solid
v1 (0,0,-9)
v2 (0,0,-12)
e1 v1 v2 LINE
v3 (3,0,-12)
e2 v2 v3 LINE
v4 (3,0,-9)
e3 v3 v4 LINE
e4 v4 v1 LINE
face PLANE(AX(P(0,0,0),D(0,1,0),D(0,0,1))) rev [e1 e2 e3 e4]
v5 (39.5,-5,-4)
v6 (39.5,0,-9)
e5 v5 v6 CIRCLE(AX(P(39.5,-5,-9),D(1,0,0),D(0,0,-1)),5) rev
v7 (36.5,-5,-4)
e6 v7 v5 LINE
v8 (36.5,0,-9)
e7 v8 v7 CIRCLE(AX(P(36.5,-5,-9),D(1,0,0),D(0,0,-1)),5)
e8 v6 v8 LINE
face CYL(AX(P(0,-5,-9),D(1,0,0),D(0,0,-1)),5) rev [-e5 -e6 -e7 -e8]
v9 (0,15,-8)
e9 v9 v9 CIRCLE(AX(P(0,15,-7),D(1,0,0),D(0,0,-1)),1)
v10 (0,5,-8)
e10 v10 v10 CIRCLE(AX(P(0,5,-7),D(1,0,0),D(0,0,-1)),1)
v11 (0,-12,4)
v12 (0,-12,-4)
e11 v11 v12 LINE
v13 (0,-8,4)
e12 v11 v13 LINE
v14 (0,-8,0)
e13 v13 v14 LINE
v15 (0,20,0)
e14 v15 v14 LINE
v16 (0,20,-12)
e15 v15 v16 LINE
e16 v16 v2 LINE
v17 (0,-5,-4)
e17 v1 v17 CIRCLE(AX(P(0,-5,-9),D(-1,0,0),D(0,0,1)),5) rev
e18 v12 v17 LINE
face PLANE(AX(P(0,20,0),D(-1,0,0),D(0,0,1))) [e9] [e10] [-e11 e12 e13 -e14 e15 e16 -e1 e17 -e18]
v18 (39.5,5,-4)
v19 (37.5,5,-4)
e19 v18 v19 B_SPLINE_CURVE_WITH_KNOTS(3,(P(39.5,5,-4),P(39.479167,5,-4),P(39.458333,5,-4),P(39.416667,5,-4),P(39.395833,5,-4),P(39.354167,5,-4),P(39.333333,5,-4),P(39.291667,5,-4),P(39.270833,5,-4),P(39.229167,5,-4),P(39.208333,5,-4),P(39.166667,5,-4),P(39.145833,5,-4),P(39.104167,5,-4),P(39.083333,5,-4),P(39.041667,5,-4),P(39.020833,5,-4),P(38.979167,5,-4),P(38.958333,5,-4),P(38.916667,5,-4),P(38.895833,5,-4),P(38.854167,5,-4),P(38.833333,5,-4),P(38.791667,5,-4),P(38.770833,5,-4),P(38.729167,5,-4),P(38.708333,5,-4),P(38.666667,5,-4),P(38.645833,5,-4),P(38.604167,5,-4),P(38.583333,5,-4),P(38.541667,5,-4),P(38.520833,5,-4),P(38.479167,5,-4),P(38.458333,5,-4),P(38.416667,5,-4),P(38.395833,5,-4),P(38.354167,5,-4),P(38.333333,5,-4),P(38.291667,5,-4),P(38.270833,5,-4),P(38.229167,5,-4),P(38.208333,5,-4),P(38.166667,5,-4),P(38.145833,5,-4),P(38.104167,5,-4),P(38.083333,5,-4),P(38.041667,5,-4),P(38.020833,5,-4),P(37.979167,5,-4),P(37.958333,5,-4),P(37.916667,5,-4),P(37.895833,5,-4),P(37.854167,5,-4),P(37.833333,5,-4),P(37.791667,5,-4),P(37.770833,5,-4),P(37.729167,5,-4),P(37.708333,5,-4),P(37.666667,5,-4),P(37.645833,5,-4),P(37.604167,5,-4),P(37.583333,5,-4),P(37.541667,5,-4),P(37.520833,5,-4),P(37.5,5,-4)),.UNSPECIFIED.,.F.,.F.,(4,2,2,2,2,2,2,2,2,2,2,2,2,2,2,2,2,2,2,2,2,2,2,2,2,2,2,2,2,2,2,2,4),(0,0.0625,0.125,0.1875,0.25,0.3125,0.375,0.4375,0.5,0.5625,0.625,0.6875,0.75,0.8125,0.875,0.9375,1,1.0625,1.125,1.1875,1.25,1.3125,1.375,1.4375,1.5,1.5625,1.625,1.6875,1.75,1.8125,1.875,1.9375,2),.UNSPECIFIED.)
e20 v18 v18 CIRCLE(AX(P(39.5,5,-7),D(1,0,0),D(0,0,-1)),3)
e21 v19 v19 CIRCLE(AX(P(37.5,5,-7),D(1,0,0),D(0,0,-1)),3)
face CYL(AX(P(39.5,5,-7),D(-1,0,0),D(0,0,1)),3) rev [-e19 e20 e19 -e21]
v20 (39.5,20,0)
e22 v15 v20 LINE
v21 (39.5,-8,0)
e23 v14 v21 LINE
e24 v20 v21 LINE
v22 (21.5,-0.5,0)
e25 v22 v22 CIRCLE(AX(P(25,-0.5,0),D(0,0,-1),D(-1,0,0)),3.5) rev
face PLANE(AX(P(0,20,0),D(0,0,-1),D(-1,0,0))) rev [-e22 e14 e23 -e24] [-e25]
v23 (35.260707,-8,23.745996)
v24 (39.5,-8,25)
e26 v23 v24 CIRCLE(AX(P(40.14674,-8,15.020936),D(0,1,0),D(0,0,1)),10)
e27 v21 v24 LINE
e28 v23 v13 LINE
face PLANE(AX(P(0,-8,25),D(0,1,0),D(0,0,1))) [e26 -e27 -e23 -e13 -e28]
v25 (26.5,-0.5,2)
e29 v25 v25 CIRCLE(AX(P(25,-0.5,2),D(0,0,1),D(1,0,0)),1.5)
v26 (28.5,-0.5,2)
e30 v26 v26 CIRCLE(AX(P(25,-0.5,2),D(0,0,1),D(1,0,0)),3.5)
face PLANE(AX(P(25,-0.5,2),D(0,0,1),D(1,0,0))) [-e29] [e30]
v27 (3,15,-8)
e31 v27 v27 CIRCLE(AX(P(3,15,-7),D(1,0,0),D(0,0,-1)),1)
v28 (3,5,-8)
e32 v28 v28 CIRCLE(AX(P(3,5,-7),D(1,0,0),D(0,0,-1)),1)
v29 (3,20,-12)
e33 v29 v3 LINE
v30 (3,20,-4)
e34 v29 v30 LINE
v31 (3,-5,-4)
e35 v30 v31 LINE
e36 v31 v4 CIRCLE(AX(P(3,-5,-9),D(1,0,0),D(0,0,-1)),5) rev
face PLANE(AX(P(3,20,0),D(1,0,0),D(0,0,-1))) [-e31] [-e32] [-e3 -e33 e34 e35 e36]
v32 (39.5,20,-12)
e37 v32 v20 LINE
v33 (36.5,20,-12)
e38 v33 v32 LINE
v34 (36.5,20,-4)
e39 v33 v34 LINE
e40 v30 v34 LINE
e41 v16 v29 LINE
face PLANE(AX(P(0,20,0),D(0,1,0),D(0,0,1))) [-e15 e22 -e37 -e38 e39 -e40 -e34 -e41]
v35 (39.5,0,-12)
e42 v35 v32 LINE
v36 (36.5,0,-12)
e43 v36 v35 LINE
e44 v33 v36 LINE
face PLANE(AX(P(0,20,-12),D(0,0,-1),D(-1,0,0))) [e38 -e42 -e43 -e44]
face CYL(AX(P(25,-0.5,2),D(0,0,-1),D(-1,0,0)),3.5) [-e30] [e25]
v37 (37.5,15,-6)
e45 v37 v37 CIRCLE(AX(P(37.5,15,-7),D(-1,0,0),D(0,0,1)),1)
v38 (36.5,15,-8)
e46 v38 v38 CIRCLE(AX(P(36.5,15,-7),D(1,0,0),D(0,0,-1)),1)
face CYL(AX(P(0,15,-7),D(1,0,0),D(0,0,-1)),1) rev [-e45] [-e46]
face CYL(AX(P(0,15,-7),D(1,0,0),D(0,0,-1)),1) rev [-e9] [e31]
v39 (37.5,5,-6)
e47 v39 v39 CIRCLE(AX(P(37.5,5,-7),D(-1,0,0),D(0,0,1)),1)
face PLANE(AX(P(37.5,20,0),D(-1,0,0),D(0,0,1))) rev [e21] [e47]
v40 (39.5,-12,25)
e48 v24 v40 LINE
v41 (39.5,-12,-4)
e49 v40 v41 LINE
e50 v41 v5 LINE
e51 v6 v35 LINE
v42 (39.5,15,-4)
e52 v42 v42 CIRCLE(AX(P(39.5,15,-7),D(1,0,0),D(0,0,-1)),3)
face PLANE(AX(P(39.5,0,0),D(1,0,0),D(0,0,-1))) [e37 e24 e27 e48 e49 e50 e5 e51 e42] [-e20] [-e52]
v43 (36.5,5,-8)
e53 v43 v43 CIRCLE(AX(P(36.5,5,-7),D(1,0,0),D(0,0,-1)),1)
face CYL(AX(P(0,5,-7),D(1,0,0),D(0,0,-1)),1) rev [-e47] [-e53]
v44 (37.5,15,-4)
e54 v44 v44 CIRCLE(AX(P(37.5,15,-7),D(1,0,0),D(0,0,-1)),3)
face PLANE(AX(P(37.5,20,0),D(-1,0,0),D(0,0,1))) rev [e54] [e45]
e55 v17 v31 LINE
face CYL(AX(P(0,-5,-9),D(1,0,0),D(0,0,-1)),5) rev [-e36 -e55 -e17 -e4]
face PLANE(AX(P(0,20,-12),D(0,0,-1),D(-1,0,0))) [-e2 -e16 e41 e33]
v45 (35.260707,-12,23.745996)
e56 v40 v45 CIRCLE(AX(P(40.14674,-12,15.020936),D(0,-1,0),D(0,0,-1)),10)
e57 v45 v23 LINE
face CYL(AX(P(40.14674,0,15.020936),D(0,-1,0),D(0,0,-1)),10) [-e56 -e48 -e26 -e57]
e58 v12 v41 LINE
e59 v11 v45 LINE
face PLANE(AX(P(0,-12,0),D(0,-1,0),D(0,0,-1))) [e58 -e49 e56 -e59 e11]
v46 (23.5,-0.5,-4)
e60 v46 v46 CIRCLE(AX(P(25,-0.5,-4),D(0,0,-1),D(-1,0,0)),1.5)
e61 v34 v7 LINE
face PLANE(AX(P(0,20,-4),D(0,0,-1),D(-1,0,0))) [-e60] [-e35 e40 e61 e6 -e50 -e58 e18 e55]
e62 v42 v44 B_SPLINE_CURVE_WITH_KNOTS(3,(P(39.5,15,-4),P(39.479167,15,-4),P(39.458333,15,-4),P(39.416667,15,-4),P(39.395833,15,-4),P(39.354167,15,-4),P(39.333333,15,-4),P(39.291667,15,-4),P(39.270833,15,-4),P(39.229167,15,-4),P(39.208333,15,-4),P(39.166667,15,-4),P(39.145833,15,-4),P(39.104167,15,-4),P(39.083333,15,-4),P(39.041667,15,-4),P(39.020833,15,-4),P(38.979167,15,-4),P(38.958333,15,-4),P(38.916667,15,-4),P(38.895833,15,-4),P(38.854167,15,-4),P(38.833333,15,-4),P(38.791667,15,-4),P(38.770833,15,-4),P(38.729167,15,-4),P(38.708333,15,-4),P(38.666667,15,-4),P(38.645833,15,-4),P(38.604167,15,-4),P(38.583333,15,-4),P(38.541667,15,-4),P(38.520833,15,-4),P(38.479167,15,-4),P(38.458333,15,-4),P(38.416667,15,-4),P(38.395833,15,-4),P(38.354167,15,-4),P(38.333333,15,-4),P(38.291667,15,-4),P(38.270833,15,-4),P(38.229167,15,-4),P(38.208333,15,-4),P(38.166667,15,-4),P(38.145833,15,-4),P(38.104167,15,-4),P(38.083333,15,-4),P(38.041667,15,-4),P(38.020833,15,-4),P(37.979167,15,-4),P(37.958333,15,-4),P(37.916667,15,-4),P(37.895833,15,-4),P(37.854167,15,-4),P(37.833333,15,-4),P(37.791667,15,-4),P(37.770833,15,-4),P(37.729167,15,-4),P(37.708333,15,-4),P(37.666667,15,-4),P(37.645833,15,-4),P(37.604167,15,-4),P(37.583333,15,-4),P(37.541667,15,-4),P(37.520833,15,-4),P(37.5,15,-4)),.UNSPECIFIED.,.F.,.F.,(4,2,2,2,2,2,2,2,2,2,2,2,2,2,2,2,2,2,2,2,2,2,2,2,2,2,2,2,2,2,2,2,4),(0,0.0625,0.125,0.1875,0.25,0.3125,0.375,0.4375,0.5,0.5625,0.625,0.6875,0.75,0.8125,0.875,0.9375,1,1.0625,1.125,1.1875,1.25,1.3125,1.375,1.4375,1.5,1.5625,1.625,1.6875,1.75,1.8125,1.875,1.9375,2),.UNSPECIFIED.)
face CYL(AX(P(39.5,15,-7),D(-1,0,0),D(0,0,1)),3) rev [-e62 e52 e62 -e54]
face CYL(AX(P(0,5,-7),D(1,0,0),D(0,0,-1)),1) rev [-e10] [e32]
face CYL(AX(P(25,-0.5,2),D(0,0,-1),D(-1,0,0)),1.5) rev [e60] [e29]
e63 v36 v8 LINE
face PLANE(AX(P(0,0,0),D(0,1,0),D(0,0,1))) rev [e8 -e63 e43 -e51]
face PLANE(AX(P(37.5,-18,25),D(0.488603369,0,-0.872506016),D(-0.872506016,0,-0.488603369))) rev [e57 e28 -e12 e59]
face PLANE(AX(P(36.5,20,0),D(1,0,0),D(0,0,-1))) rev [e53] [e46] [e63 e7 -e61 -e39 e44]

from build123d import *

# Parameters (mm, degrees)
BOSS_EXTRUDE1_DEPTH     = 20
SKETCH2_W               = 37.5
SKETCH2_H               = 4
BOSS_EXTRUDE2_DEPTH     = 12
FILLET1_R               = 5
SKETCH3_W               = 37.5
SKETCH3_H               = 4
BOSS_EXTRUDE3_DEPTH     = 25
SKETCH4_R               = 3.5
SKETCH4_R_2             = 1.5
BOSS_EXTRUDE4_DEPTH     = 2
SKETCH5_R               = 1.5
CUT_EXTRUDE1_DEPTH      = 49.324424466
CUT_EXTRUDE2_DEPTH      = 10
CUT_EXTRUDE3_DEPTH      = 50.307707308
CUT_EXTRUDE3_DEPTH_BACK = 50.307707308
SKETCH8_R               = 1
SKETCH9_R               = 3
BOSS_EXTRUDE5_DEPTH     = 2
FILLET2_R               = 10


with BuildPart() as part:
    # Sketch1 → Boss-Extrude1 (new body)
    with BuildSketch(Plane(origin=(0, 0, 0), x_dir=(1, 0, 0), z_dir=(0, 1, 0))):
        Polygon((0, 12), (0, 0), (37.5, 0), (37.5, 12), (36.5, 12), (36.5, 4), (3, 4), (3, 12), align=None)
    extrude(amount=BOSS_EXTRUDE1_DEPTH)

    # Sketch2 → Boss-Extrude2 (add)
    with BuildSketch(Plane.XZ):
        with Locations((18.75, -2)):
            Rectangle(SKETCH2_W, SKETCH2_H)
    extrude(amount=BOSS_EXTRUDE2_DEPTH)

    # Fillet1
    fillet1_edges = [part.edges().sort_by_distance(p)[0] for p in [
        (37, 0, -4),
        (1.5, 0, -4),
    ]]
    fillet(fillet1_edges, radius=FILLET1_R)

    # Sketch3 → Boss-Extrude3 (add)
    with BuildSketch(Plane.XY):
        with Locations((18.75, -10)):
            Rectangle(SKETCH3_W, SKETCH3_H)
    extrude(amount=BOSS_EXTRUDE3_DEPTH)

    # Sketch4 → Boss-Extrude4 (add)
    with BuildSketch(Plane.XY):
        with Locations(Location((25, -0.5, 0), (0, 0, 180))):
            Circle(SKETCH4_R)
        with Locations((25, -0.5)):
            Circle(SKETCH4_R_2, mode=Mode.SUBTRACT)
    extrude(amount=BOSS_EXTRUDE4_DEPTH)

    # Sketch5 → Cut-Extrude1 (cut, through all)
    with BuildSketch(Plane.XY.offset(2)):
        with Locations(Location((25, -0.5, 0), (0, 0, 180))):
            Circle(SKETCH5_R)
    extrude(amount=-CUT_EXTRUDE1_DEPTH, mode=Mode.SUBTRACT)

    # Sketch6 → Cut-Extrude2 (cut)
    with BuildSketch(Plane(origin=(0, -8, 0), x_dir=(1, 0, 0), z_dir=(0, 1, 0))):
        Polygon((37.5, -25), (0, -4), (0, -25), align=None)
    extrude(amount=-CUT_EXTRUDE2_DEPTH, mode=Mode.SUBTRACT)

    # Sketch8 → Cut-Extrude3 (cut, two sides: drawn at the far end of the back side and taken through both)
    with BuildSketch(Plane(origin=(37.5, 0, 0), x_dir=(0, 0, -1), z_dir=(1, 0, 0)).offset(-CUT_EXTRUDE3_DEPTH_BACK)):
        with Locations((7, 15)):
            Circle(SKETCH8_R)
        with Locations((7, 5)):
            Circle(SKETCH8_R)
    extrude(amount=CUT_EXTRUDE3_DEPTH + CUT_EXTRUDE3_DEPTH_BACK, mode=Mode.SUBTRACT)

    # Sketch9 → Boss-Extrude5 (add)
    with BuildSketch(Plane(origin=(37.5, 0, 0), x_dir=(0, 0, -1), z_dir=(1, 0, 0))):
        with BuildLine():
            Line((12, 20), (0, 20))
            Line((0, 20), (0, -8))
            Line((0, -8), (-25, -8))
            Line((-25, -8), (-25, -12))
            Line((-25, -12), (4, -12))
            Line((4, -12), (4, -5))
            ThreePointArc((4, -5), (5.464466094, -1.464466094), (9, 0))
            Line((9, 0), (12, 0))
            Line((12, 0), (12, 20))
        make_face()
        with Locations(Location((7, 5, 0), (0, 0, 180))):
            Circle(SKETCH9_R, mode=Mode.SUBTRACT)
        with Locations(Location((7, 15, 0), (0, 0, 180))):
            Circle(SKETCH9_R, mode=Mode.SUBTRACT)
    extrude(amount=BOSS_EXTRUDE5_DEPTH)

    # Fillet2
    # the kernel refuses this fillet: 10 mm, written as the material it takes off along each edge
    with BuildSketch(Plane(origin=(37.5, -18.416269062, 25), x_dir=(1, 0, 0), z_dir=(0, 1, 0))) as fillet2_piece_1:
        with BuildLine():
            CenterArc((2.646740347, 9.979064431), FILLET2_R, 240.751173663, 25.540689012)
            Line((-2.239293342, 1.254004272), (-2.337014016, 1.079503069))
            Line((-2.337014016, 1.079503069), (-0.097720674, -0.174501203))
            Line((-0.097720674, -0.174501203), (0, -0.2))
            ThreePointArc((0, -0.2), (1, -0.2), (1.987065193, -0.199581289))
            Line((1.987065193, -0.199581289), (2, 0))
        make_face()
    extrude(amount=16.832538123, mode=Mode.SUBTRACT)


solid = part.part
